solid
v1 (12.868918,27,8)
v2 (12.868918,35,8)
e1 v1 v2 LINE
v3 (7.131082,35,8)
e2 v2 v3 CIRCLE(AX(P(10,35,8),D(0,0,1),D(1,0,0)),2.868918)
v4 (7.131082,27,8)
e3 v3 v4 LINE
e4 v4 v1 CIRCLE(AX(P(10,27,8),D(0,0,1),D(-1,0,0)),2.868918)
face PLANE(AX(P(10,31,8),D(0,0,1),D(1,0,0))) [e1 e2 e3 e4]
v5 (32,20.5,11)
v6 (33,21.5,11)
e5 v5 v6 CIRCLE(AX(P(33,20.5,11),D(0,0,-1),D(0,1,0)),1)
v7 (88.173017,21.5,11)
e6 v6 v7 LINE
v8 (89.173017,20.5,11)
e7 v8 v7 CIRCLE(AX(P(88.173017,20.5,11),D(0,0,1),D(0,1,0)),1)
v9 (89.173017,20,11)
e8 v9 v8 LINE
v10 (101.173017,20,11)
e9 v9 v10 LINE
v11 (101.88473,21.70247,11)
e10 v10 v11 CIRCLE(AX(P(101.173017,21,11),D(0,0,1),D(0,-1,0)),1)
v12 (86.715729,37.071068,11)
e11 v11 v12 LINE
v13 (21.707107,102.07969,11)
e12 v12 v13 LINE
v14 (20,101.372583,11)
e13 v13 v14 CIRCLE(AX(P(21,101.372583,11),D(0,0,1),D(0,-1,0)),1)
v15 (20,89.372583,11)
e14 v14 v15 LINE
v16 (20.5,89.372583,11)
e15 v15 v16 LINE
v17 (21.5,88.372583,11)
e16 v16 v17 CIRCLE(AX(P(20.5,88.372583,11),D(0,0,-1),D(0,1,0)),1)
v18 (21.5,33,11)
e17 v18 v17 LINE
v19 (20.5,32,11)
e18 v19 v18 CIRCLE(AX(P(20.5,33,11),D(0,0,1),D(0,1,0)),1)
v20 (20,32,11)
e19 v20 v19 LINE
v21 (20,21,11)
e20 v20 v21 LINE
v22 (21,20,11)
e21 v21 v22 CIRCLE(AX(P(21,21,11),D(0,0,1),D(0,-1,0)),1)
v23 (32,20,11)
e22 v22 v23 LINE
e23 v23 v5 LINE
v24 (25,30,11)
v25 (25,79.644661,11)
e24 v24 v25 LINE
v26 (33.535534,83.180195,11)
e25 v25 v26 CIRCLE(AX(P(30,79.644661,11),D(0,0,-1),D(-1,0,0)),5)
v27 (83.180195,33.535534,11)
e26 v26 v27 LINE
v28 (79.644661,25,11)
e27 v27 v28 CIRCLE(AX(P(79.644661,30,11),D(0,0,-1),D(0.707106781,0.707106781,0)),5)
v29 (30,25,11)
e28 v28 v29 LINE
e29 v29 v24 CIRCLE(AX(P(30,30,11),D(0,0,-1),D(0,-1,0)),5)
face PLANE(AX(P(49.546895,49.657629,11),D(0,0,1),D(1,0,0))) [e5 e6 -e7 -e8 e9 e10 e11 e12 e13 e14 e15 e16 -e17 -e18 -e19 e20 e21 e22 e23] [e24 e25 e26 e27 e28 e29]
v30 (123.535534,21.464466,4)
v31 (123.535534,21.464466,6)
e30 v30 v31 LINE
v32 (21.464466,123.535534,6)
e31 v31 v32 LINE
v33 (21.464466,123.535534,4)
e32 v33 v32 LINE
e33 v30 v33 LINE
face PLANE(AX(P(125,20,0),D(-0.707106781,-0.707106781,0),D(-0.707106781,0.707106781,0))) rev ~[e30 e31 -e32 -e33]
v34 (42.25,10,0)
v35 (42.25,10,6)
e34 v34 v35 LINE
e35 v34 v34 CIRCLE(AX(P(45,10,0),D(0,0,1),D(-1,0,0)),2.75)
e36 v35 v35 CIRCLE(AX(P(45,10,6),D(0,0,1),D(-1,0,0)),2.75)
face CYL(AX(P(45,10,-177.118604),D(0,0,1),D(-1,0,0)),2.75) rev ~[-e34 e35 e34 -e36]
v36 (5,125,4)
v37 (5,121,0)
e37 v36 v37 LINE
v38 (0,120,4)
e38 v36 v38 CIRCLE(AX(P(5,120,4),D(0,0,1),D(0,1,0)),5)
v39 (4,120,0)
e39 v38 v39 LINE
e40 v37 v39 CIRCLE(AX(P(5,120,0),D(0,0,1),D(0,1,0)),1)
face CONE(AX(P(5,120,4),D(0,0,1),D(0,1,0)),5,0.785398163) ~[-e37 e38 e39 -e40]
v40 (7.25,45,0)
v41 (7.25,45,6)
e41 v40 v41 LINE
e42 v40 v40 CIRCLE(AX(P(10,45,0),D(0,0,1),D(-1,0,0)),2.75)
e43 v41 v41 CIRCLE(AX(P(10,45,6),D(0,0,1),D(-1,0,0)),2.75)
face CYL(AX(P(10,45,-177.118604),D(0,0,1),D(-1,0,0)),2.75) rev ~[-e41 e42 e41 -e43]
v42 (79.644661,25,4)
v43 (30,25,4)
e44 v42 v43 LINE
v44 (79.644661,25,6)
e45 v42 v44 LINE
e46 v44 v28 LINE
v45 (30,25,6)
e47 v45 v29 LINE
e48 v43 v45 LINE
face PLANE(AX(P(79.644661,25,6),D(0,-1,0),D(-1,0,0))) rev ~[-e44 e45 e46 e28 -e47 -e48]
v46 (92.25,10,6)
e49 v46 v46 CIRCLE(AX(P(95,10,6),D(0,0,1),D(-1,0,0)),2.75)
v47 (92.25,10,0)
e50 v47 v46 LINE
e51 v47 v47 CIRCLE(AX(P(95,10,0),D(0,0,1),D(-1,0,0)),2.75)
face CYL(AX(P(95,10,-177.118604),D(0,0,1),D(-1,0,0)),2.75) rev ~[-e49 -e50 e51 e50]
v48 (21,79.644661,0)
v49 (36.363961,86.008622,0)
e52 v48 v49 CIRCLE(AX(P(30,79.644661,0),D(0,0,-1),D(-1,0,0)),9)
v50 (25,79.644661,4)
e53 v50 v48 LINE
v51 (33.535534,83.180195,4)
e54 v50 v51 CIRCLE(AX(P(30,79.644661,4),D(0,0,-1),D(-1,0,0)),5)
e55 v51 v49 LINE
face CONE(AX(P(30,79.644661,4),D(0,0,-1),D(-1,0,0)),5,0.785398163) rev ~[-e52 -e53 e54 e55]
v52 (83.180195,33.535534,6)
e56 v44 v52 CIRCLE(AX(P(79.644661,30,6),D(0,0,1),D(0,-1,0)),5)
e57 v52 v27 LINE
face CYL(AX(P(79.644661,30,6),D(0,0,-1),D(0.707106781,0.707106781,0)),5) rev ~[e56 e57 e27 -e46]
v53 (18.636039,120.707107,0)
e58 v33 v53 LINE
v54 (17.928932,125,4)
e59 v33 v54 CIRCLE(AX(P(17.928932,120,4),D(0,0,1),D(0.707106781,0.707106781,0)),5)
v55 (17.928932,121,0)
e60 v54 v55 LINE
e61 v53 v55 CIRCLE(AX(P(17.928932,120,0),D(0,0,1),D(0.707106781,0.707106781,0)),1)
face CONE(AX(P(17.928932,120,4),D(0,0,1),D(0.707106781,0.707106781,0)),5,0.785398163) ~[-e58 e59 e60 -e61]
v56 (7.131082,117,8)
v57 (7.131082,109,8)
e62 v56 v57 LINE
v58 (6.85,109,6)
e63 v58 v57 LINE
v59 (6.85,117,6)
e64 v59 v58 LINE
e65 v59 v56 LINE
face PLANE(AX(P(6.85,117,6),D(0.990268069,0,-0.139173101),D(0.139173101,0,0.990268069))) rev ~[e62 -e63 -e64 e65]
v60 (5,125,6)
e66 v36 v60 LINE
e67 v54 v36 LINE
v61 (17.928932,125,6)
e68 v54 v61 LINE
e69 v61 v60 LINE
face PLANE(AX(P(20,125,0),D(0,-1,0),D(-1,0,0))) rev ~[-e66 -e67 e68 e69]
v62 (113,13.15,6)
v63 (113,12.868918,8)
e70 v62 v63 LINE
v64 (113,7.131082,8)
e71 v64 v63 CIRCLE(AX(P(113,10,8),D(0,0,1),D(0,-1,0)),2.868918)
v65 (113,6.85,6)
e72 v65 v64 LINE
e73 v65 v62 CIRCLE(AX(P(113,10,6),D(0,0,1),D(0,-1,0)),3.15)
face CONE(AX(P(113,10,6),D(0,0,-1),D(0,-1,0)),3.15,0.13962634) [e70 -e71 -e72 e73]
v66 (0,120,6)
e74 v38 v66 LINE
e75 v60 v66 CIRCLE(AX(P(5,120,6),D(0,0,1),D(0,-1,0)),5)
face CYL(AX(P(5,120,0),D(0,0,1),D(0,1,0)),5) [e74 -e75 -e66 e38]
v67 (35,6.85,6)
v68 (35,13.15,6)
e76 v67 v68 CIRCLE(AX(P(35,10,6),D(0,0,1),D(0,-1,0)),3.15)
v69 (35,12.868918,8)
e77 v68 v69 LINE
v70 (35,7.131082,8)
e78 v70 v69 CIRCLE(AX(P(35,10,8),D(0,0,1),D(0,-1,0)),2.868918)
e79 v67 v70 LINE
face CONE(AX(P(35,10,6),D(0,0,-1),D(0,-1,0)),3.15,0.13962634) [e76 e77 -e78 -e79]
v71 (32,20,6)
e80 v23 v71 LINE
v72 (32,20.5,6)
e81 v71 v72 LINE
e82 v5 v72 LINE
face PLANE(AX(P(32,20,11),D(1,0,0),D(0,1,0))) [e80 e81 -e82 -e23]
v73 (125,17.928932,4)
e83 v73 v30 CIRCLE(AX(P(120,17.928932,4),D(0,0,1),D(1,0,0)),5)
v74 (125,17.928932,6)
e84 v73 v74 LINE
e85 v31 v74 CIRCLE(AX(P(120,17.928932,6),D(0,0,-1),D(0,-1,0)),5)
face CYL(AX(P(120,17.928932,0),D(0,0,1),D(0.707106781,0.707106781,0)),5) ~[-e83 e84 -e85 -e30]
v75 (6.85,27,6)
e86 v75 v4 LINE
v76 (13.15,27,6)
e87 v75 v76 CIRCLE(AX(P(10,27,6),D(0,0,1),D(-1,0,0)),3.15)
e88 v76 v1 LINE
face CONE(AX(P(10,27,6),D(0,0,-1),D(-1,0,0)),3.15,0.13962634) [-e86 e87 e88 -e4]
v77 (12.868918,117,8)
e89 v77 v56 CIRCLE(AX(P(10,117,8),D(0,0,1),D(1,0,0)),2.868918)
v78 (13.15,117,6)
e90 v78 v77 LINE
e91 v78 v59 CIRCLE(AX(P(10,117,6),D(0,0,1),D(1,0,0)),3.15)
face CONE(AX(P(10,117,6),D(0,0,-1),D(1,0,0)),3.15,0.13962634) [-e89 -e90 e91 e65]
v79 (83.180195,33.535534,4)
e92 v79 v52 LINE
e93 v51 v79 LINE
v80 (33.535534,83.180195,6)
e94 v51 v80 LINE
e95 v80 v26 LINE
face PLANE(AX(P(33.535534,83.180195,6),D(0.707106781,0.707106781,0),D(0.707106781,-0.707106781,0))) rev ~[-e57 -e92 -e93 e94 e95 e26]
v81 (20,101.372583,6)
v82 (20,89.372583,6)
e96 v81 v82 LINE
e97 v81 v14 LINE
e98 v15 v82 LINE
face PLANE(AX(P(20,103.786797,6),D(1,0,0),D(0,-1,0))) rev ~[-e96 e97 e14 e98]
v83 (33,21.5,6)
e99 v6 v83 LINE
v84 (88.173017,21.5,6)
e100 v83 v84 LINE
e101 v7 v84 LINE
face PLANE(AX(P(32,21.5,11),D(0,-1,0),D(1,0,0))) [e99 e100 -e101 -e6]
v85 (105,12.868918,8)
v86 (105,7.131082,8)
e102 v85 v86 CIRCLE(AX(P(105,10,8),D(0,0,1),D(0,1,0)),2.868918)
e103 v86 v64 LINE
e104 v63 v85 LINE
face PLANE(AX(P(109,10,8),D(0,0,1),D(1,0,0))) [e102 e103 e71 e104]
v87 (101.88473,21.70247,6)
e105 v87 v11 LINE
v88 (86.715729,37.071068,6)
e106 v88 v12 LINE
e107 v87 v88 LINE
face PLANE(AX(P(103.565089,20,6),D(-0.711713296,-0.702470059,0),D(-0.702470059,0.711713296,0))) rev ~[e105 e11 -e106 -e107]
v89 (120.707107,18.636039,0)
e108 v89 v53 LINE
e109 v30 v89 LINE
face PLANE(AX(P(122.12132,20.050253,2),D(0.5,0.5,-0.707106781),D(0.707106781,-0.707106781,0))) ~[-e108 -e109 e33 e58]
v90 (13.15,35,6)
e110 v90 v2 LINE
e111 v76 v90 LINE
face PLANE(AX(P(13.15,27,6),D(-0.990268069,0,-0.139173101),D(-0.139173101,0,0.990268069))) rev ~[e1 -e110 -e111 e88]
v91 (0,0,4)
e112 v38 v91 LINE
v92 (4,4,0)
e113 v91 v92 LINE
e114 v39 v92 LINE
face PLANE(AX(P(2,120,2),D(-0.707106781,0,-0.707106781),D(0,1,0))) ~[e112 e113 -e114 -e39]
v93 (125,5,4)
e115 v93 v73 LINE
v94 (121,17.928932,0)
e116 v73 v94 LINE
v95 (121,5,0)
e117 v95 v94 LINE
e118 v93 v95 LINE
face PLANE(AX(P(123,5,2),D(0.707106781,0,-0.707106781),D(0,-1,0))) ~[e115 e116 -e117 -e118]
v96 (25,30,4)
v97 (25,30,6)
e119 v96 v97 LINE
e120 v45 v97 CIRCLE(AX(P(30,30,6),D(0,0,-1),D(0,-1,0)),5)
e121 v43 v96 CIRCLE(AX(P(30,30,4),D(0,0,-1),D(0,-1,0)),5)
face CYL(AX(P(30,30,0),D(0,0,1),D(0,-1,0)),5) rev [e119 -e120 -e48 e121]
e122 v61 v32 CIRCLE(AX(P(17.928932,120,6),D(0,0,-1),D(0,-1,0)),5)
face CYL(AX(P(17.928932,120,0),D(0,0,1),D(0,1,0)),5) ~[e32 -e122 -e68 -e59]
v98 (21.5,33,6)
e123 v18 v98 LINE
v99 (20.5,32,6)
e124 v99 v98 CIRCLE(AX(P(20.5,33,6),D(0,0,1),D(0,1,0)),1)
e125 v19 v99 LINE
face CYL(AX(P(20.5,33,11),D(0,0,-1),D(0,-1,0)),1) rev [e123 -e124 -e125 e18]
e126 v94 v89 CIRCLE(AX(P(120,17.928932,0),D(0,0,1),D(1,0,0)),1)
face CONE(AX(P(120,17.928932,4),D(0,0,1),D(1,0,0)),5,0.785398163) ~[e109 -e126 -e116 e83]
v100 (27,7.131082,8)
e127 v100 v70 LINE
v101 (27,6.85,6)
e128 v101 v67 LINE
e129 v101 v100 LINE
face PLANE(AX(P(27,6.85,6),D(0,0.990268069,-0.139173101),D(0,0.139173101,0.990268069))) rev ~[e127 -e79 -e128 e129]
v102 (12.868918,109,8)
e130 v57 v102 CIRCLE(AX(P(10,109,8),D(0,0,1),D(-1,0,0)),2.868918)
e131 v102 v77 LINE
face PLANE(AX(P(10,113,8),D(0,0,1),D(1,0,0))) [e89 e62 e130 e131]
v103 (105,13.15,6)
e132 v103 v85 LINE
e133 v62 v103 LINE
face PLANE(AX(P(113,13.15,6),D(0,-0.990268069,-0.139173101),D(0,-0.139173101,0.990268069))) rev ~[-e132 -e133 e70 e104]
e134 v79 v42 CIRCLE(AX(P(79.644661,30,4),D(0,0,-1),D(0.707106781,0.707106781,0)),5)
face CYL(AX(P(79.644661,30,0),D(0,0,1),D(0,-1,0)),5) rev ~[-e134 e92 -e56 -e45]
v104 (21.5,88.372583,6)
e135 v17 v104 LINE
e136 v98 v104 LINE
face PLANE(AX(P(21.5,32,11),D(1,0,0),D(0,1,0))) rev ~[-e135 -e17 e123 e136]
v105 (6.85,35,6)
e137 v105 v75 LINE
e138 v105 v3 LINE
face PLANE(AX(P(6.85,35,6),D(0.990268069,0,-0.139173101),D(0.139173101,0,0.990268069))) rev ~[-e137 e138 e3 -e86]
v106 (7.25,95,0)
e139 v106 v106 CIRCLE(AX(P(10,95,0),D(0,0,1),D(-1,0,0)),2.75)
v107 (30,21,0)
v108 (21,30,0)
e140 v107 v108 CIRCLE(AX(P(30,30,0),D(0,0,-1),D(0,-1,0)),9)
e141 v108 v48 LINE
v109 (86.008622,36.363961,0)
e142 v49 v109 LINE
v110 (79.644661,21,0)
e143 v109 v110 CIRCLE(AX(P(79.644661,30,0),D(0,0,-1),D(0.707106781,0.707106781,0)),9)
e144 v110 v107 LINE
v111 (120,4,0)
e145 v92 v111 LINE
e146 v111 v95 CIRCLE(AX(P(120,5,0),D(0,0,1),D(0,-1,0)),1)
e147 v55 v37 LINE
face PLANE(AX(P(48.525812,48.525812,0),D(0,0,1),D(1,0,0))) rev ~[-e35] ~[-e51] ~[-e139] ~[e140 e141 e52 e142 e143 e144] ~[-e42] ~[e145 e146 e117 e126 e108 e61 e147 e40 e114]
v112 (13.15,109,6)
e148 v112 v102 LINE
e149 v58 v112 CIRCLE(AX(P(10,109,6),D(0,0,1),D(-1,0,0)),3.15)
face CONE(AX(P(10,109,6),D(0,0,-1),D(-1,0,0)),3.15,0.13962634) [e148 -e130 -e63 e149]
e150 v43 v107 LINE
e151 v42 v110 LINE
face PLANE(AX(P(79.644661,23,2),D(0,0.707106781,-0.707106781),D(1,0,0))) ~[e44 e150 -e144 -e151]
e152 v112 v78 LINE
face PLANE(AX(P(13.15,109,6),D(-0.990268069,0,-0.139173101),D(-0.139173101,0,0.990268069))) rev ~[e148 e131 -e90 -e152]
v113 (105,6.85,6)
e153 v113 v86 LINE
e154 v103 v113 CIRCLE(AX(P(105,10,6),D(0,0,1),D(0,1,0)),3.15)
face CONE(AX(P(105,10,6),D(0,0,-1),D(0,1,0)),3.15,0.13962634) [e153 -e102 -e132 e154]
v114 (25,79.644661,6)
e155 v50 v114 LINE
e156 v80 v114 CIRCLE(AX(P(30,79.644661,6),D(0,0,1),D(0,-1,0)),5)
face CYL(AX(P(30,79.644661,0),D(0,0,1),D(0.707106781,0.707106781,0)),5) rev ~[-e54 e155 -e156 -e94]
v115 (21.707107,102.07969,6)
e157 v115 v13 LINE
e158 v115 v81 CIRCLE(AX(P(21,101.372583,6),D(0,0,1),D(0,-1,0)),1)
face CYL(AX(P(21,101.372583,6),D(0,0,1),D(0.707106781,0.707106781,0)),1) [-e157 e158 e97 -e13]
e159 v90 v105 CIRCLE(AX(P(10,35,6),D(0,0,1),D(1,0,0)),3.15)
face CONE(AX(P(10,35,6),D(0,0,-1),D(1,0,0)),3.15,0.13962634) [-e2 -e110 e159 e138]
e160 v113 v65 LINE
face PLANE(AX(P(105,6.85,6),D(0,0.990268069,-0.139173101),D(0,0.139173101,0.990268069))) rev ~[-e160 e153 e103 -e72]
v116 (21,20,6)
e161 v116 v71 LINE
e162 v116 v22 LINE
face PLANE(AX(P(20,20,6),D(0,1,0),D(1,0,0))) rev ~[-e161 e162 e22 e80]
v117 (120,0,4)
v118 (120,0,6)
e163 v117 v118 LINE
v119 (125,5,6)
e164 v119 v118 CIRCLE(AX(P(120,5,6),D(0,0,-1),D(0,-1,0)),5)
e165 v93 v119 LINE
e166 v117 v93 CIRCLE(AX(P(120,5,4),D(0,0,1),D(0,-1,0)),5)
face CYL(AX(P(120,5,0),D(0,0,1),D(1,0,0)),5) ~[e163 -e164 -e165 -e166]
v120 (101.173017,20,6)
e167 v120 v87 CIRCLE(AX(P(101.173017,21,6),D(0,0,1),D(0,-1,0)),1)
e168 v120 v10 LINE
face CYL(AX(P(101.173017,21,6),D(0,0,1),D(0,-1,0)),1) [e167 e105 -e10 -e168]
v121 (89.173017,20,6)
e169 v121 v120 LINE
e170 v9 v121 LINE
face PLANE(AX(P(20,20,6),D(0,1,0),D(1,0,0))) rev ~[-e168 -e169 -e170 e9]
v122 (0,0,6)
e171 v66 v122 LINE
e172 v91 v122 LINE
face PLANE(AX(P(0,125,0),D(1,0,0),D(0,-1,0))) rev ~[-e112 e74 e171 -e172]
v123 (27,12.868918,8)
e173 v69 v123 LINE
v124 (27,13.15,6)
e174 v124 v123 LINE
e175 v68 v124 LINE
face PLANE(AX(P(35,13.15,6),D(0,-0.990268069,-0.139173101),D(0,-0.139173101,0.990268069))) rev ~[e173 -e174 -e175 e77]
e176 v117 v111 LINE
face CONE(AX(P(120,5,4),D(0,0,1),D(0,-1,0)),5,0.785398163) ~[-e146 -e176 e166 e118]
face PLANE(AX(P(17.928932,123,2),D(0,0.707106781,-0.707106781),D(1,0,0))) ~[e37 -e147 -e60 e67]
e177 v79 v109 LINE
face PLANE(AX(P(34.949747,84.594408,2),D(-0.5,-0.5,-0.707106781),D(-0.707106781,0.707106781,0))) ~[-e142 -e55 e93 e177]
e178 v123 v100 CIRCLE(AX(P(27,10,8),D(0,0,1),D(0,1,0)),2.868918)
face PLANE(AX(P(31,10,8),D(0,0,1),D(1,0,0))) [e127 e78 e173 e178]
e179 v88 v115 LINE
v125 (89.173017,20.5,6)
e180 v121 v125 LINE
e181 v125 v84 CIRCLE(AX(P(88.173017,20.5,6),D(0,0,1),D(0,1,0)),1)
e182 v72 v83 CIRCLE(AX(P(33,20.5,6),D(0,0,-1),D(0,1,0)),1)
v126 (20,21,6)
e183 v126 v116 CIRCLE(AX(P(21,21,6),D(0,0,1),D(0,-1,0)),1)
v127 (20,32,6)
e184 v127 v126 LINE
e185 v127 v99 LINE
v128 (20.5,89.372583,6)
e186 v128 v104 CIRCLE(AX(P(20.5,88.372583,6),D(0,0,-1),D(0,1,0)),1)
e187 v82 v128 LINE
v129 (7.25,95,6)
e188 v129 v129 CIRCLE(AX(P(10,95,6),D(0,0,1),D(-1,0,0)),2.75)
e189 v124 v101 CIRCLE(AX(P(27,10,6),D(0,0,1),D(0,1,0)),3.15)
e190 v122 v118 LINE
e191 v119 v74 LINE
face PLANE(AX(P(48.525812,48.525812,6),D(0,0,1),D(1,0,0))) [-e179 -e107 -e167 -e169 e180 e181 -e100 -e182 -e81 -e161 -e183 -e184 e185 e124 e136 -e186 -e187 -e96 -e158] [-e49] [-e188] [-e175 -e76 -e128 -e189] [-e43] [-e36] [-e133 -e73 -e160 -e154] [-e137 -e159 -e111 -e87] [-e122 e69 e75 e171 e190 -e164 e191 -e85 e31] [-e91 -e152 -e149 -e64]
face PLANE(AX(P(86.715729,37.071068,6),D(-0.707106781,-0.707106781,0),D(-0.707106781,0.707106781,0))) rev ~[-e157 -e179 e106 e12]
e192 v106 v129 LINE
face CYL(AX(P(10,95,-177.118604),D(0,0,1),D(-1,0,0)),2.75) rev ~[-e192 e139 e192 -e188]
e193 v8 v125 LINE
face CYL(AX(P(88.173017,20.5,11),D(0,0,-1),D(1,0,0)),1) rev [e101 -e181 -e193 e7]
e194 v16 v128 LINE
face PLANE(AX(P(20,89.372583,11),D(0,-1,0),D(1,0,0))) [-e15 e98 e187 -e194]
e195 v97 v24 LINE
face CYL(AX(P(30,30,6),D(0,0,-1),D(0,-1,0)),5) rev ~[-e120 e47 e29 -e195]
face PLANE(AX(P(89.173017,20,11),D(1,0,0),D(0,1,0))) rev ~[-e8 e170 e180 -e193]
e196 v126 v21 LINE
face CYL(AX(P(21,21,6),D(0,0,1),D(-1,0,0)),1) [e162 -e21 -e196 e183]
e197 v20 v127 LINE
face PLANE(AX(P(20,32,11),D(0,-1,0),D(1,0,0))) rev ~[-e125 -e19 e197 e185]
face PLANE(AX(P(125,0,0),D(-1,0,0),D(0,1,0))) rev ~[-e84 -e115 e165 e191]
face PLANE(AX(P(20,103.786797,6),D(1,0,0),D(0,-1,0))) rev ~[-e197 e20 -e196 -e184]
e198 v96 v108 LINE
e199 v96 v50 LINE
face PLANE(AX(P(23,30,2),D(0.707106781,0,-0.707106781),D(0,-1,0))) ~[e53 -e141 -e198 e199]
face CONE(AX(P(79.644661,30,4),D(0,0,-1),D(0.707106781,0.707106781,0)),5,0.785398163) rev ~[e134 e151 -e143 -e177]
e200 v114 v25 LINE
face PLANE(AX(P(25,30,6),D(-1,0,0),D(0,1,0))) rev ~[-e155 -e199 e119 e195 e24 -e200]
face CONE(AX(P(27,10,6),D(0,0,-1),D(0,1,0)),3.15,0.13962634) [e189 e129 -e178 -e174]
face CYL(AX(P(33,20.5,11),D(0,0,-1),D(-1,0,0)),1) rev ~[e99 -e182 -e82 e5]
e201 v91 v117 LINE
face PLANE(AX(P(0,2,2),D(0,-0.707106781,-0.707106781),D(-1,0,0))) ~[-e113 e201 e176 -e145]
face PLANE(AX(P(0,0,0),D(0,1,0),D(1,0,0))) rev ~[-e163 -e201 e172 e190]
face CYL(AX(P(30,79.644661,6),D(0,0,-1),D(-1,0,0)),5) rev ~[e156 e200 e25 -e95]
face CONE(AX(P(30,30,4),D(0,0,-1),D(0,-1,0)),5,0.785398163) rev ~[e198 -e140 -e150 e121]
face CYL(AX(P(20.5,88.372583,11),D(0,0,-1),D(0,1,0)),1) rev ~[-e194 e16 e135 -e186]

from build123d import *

# Parameters (mm, degrees)
F1_DEPTH  = 6
F2_R      = 5
F4_DEPTH  = 5
F5_SIZE   = 4
F6_R      = 1
F8_D      = 5.5
F9_W      = 57.1730165467
F9_H      = 1.5
F9_W_2    = 1.5
F9_H_2    = 57.372583002
F10_DEPTH = 5
F11_R     = 1
F13_DEPTH = 2
F13_TAPER = 8


with BuildPart() as f1:
    # F0 (on Top) → F1 (new body)
    with BuildSketch(Plane.XY):
        Polygon((20, 125), (0, 125), (0, 0), (125, 0), (125, 20), align=None)
        Polygon((25, 25), (25, 91.7157287525), (91.7157287525, 25), align=None, mode=Mode.SUBTRACT)
    extrude(amount=F1_DEPTH)

    # F2
    f2_edges = [f1.edges().sort_by_distance(p)[0] for p in [
        (25, 91.715729, 3),
        (91.715729, 25, 3),
        (25, 25, 3),
        (0, 125, 3),
        (20, 125, 3),
        (125, 20, 3),
        (125, 0, 3),
    ]]
    fillet(f2_edges, radius=F2_R)

    # F3 (on face) → F4 (join)
    with BuildSketch(Plane.XY.offset(6)):
        Polygon((86.7157287525, 37.0710678119), (37.0710678119, 86.7157287525), (20, 103.7867965644), (20, 79.6446609407), (20, 30), (20, 20), (30, 20), (79.6446609407, 20), (103.5650894046, 20), align=None)
        with BuildLine():
            ThreePointArc((30, 25), (26.4644660941, 26.4644660941), (25, 30))
            Line((25, 30), (25, 79.6446609407))
            ThreePointArc((25, 79.6446609407), (28.0865828382, 84.2640586032), (33.5355339059, 83.1801948466))
            Line((33.5355339059, 83.1801948466), (83.1801948466, 33.5355339059))
            ThreePointArc((83.1801948466, 33.5355339059), (84.2640586032, 28.0865828382), (79.6446609407, 25))
            Line((79.6446609407, 25), (30, 25))
        make_face(mode=Mode.SUBTRACT)
    extrude(amount=F4_DEPTH)

    # F5
    f5_edges = [f1.edges().sort_by_distance(p)[0] for p in [
        (58.357864, 58.357864, 0),
        (72.5, 72.5, 0),
    ]]
    chamfer(f5_edges, length=F5_SIZE)

    # F6
    f6_edges = [f1.edges().sort_by_distance(p)[0] for p in [
        (20, 103.786797, 8.5),
        (20, 20, 8.5),
        (103.565089, 20, 8.5),
    ]]
    fillet(f6_edges, radius=F6_R)

    # F8 (through all)
    with Locations(Plane(origin=(0, 0, 0), x_dir=(1, 0, 0), z_dir=(0, 0, -1))):
        with Locations((95, -10), (45, -10), (10, -45), (10, -95)):
            Hole(F8_D / 2)

    # F9 (on face) → F10 (cut, through all)
    with BuildSketch(Plane.XY.offset(11)):
        with Locations((60.5865082733, 20.75)):
            Rectangle(F9_W, F9_H)
        with Locations((20.75, 60.686291501)):
            Rectangle(F9_W_2, F9_H_2)
    extrude(amount=-F10_DEPTH, mode=Mode.SUBTRACT)

    # F11
    f11_edges = [f1.edges().sort_by_distance(p)[0] for p in [
        (21.5, 89.372583, 8.5),
        (21.5, 32, 8.5),
        (32, 21.5, 8.5),
        (89.173017, 21.5, 8.5),
    ]]
    fillet(f11_edges, radius=F11_R)

    # F12 (on face) → F13 (join)
    with BuildSketch(Plane.XY.offset(6)):
        with BuildLine():
            Line((6.85, 117), (6.85, 109))
            ThreePointArc((6.85, 109), (10, 105.85), (13.15, 109))
            Line((13.15, 109), (13.15, 117))
            ThreePointArc((13.15, 117), (10, 120.15), (6.85, 117))
        make_face()
        with BuildLine():
            Line((6.85, 35), (6.85, 27))
            ThreePointArc((6.85, 27), (10, 23.85), (13.15, 27))
            Line((13.15, 27), (13.15, 35))
            ThreePointArc((13.15, 35), (10, 38.15), (6.85, 35))
        make_face()
        with BuildLine():
            Line((35, 13.15), (27, 13.15))
            ThreePointArc((27, 13.15), (23.85, 10), (27, 6.85))
            Line((27, 6.85), (35, 6.85))
            ThreePointArc((35, 6.85), (38.15, 10), (35, 13.15))
        make_face()
        with BuildLine():
            Line((113, 13.15), (105, 13.15))
            ThreePointArc((105, 13.15), (101.85, 10), (105, 6.85))
            Line((105, 6.85), (113, 6.85))
            ThreePointArc((113, 6.85), (116.15, 10), (113, 13.15))
        make_face()
    extrude(amount=F13_DEPTH, taper=F13_TAPER)


solid = f1.part
